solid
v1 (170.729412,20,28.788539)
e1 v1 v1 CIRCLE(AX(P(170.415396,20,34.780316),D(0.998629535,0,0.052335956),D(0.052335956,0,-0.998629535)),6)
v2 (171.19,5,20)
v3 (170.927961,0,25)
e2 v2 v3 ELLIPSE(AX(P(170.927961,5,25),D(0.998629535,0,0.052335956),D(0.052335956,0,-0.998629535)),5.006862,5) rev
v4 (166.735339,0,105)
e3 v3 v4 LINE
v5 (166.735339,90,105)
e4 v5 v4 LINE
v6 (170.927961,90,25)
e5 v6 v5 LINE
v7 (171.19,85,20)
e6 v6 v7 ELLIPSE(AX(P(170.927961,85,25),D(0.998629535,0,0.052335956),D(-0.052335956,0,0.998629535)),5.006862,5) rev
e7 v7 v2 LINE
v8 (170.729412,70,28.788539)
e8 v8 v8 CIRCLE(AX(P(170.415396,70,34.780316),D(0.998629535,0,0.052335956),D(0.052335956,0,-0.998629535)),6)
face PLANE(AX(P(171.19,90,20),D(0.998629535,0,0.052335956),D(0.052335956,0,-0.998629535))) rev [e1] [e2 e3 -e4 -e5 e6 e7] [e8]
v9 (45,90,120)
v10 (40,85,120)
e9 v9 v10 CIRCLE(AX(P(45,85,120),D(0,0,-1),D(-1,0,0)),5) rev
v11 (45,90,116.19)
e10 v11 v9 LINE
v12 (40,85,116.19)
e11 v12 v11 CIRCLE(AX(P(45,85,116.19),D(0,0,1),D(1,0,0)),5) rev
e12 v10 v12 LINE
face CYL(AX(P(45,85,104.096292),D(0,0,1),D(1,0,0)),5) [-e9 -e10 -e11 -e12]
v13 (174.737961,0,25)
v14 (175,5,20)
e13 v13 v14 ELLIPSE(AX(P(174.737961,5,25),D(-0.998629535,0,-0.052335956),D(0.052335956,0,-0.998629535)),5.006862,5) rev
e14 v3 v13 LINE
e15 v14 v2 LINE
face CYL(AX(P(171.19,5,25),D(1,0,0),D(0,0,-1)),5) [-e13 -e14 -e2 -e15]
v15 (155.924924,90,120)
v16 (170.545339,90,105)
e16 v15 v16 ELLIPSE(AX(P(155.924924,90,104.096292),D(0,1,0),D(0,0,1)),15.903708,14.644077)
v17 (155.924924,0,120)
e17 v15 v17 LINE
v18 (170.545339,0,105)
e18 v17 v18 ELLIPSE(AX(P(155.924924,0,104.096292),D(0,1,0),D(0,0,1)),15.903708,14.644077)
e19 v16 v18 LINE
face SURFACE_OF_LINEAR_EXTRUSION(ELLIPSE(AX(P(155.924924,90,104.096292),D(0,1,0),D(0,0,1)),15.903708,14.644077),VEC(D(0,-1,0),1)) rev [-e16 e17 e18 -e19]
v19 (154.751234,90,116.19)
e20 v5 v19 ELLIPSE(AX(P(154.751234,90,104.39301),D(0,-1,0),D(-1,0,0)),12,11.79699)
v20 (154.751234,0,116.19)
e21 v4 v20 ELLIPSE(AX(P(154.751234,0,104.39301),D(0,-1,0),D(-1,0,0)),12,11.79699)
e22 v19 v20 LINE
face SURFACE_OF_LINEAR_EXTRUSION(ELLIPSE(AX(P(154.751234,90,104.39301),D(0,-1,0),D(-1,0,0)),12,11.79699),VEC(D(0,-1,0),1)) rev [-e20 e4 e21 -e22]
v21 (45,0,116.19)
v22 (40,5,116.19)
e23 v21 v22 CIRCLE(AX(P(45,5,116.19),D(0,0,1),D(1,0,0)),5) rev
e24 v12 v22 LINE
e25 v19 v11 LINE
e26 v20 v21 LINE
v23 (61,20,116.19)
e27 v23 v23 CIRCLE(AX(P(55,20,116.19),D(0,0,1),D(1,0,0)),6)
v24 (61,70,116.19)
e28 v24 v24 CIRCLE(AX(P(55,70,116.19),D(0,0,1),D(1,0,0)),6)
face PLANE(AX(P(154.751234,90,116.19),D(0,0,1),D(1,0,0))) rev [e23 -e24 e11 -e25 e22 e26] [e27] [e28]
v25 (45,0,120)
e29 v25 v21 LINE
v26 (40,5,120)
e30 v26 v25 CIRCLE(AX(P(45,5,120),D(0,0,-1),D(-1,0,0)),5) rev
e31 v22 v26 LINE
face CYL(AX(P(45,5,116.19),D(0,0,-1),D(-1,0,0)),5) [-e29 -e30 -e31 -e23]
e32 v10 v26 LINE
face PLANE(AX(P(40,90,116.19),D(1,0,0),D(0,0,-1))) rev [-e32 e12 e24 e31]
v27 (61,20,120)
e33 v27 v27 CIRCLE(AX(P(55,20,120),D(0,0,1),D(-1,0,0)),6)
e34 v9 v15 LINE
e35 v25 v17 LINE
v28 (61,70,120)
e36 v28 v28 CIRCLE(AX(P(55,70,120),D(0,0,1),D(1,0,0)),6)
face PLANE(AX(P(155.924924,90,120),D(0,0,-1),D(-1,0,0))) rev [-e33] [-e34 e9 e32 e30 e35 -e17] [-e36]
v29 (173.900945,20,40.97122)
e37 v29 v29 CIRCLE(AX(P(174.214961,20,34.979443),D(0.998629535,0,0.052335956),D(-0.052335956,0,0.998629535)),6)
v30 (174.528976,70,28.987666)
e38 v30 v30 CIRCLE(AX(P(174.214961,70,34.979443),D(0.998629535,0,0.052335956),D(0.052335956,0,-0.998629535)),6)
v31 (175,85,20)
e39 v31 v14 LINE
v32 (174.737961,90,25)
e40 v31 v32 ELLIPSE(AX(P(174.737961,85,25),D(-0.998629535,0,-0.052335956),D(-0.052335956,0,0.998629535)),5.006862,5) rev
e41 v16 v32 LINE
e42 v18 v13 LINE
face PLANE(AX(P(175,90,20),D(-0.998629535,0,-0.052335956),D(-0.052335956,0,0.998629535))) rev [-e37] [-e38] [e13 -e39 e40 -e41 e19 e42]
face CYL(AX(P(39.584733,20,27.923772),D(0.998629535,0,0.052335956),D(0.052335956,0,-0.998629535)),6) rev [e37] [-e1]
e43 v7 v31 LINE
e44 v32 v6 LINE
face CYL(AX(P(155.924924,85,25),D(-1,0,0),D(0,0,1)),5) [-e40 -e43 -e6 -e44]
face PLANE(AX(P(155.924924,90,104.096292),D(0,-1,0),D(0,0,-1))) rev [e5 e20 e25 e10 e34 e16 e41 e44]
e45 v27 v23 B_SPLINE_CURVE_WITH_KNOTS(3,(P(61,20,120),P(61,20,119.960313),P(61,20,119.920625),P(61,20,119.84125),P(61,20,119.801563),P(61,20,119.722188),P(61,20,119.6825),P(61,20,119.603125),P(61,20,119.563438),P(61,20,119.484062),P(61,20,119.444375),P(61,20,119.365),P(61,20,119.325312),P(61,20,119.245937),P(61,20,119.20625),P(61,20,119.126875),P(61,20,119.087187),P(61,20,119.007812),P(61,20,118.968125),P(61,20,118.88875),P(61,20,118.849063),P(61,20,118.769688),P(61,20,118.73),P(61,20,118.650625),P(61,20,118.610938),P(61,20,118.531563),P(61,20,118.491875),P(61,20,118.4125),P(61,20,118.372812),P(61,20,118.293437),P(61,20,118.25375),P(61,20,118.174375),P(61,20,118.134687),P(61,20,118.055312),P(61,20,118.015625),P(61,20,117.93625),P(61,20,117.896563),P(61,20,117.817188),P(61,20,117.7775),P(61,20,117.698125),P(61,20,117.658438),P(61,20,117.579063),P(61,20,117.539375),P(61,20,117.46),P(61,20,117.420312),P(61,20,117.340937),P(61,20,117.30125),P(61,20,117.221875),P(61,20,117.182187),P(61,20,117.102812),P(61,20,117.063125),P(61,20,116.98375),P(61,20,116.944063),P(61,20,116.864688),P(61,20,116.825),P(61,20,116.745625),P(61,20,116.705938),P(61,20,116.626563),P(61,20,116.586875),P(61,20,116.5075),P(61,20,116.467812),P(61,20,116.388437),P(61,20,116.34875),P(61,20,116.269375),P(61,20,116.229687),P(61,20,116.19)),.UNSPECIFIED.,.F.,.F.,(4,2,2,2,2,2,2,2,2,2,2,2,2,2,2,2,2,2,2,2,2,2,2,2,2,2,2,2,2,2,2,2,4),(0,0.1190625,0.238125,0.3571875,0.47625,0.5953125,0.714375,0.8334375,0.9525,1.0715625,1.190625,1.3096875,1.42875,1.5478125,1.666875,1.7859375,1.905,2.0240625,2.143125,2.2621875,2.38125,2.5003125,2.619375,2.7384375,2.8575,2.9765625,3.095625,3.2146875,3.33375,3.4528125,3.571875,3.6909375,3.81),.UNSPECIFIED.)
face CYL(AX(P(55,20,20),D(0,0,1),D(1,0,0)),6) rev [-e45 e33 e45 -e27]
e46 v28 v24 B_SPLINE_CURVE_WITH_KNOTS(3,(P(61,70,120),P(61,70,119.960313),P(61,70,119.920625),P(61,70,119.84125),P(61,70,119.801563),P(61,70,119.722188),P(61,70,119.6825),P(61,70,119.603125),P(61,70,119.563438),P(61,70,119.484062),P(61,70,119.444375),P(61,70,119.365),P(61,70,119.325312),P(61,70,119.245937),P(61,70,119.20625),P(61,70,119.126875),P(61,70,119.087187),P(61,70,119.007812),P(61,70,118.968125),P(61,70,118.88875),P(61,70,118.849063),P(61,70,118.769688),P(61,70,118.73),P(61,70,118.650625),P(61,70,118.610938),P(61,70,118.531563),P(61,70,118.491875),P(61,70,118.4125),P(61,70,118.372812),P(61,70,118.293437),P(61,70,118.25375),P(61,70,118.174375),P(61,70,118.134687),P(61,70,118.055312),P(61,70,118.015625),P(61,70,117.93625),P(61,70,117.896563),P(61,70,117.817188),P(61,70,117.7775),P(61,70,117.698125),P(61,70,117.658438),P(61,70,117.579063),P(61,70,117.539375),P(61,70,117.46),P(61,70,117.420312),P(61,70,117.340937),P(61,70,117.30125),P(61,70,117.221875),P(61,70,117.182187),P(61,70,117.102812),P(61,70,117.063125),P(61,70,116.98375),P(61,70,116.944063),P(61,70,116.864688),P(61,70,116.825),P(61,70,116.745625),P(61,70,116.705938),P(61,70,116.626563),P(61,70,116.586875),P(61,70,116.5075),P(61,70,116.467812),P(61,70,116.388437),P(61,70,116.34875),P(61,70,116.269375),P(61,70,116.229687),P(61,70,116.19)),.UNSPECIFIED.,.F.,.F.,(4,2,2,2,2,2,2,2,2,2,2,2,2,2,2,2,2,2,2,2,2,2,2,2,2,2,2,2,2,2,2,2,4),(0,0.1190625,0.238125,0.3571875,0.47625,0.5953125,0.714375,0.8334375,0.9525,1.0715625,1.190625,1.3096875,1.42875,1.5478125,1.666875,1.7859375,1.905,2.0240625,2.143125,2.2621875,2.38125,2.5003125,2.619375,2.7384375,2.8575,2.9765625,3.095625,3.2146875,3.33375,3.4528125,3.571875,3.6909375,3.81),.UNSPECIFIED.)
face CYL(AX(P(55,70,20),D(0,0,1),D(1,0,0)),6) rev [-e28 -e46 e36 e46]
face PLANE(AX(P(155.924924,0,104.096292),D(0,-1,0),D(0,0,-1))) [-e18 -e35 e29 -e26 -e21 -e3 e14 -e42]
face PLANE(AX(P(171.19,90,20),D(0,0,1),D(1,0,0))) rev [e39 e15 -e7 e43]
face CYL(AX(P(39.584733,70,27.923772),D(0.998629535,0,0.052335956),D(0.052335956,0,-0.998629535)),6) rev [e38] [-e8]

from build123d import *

# Parameters (mm, degrees)
BOSS_EXTRUDE1_DEPTH     = 90
CUT_EXTRUDE1_DEPTH      = 221.737400712
CUT_EXTRUDE1_DEPTH_BACK = 221.737400712
SKETCH3_R               = 6
CUT_EXTRUDE2_DEPTH      = 203.489832762
CUT_EXTRUDE2_DEPTH_BACK = 203.489832762
SKETCH4_R               = 6
FILLET1_R               = 5
BOSS_EXTRUDE2_DEPTH     = 90
SAVE_BODIES1_DEPTH      = 90


# Read off the part's stored shape, not the designer's step: Save Bodies1
with BuildPart() as part:
    # Sketch1 → Boss-Extrude1 (new body)
    with BuildSketch(Plane(origin=(0, 0, 0), x_dir=(1, 0, 0), z_dir=(0, 1, 0))):
        with BuildLine():
            Line((154.751233709, -116.19), (40, -116.19))
            Line((40, -116.19), (40, -120))
            Line((40, -120), (155.92492368, -120))
            add(Edge.make_bspline(
                [(155.92492368, -120), (169.759222072, -120), (170.545338761, -105)],
                knots=[0, 0, 0, 1.513941954, 1.513941954, 1.513941954], degree=2, weights=[1, 0.726919441, 1]))
            Line((170.545338761, -105), (175, -20))
            Line((175, -20), (171.19, -20))
            Line((171.19, -20), (166.735338761, -105))
            add(Edge.make_bspline(
                [(154.751233709, -116.19), (166.148895711, -116.19), (166.735338761, -105)],
                knots=[1.570796327, 1.570796327, 1.570796327, 3.090116999, 3.090116999, 3.090116999], degree=2, weights=[1, 0.725069971, 1]))
        make_face()
    extrude(amount=BOSS_EXTRUDE1_DEPTH)

    # Sketch3 → Cut-Extrude1 (cut, two sides: drawn at the far end of the back side and taken through both)
    with BuildSketch(Plane.XY.offset(120).offset(-CUT_EXTRUDE1_DEPTH_BACK)):
        with Locations((55, 70)):
            Circle(SKETCH3_R)
        with Locations((55, 20)):
            Circle(SKETCH3_R)
    extrude(amount=CUT_EXTRUDE1_DEPTH + CUT_EXTRUDE1_DEPTH_BACK, mode=Mode.SUBTRACT)

    # Sketch4 → Cut-Extrude2 (cut, two sides: drawn at the far end of the back side and taken through both)
    with BuildSketch(Plane(origin=(176.046719125, 0, 0.027409305), x_dir=(0.052335956242940504, 0, -0.9986295347545742), z_dir=(0.9986295347545742, 0, 0.052335956242940504)).offset(-CUT_EXTRUDE2_DEPTH_BACK)):
        with Locations((-35, 70)):
            Circle(SKETCH4_R)
        with Locations((-35, 20)):
            Circle(SKETCH4_R)
    extrude(amount=CUT_EXTRUDE2_DEPTH + CUT_EXTRUDE2_DEPTH_BACK, mode=Mode.SUBTRACT)

    # Fillet1
    fillet1_edges = [part.edges().sort_by_distance(p)[0] for p in [
        (173.095, 0, 20),
        (173.095, 90, 20),
        (40, 90, 118.095),
        (40, 0, 118.095),
    ]]
    fillet(fillet1_edges, radius=FILLET1_R)


with BuildPart() as body_2:
    # Sketch5 → Boss-Extrude2 (new body)
    with BuildSketch(Plane(origin=(0, 0, 0), x_dir=(1, 0, 0), z_dir=(0, 1, 0))):
        with BuildLine():
            Line((154.751233709, -116.19), (40, -116.19))
            Line((40, -116.19), (40, -96.19))
            Line((40, -96.19), (128.217759962, -96.19))
            ThreePointArc((128.217759962, -96.19), (141.984851476, -90.69748742), (148.190350657, -77.236719125))
            Line((148.190350657, -77.236719125), (151.19, -20))
            Line((151.19, -20), (171.19, -20))
            Line((171.19, -20), (166.735338761, -105))
            add(Edge.make_bspline(
                [(154.751233709, -116.19), (166.148895711, -116.19), (166.735338761, -105)],
                knots=[1.570796327, 1.570796327, 1.570796327, 3.090116999, 3.090116999, 3.090116999], degree=2, weights=[1, 0.725069971, 1]))
        make_face()
    extrude(amount=BOSS_EXTRUDE2_DEPTH)

    # Save Bodies1 outline → Save Bodies1 (cut)
    with BuildSketch(Plane(origin=(0, 0, 0), x_dir=(1, 0, 0), z_dir=(0, 1, 0))):
        with BuildLine():
            Line((171.19, -20), (151.19, -20))
            Line((151.19, -20), (148.190350657, -77.236719125))
            ThreePointArc((148.190350657, -77.236719125), (141.984851476, -90.69748742), (128.217759962, -96.19))
            Line((128.217759962, -96.19), (40, -96.19))
            Line((40, -96.19), (40, -116.19))
            Line((40, -116.19), (154.751233709, -116.19))
            add(Edge.make_bspline(
                [(166.735338761, -105), (166.148895711, -116.19), (154.751233709, -116.19)],
                knots=[3.193068309, 3.193068309, 3.193068309, 4.71238898, 4.71238898, 4.71238898], degree=2, weights=[1, 0.725069971, 1]))
            Line((166.735338761, -105), (171.19, -20))
        make_face()
    extrude(amount=SAVE_BODIES1_DEPTH, mode=Mode.SUBTRACT)


solid = part.part
